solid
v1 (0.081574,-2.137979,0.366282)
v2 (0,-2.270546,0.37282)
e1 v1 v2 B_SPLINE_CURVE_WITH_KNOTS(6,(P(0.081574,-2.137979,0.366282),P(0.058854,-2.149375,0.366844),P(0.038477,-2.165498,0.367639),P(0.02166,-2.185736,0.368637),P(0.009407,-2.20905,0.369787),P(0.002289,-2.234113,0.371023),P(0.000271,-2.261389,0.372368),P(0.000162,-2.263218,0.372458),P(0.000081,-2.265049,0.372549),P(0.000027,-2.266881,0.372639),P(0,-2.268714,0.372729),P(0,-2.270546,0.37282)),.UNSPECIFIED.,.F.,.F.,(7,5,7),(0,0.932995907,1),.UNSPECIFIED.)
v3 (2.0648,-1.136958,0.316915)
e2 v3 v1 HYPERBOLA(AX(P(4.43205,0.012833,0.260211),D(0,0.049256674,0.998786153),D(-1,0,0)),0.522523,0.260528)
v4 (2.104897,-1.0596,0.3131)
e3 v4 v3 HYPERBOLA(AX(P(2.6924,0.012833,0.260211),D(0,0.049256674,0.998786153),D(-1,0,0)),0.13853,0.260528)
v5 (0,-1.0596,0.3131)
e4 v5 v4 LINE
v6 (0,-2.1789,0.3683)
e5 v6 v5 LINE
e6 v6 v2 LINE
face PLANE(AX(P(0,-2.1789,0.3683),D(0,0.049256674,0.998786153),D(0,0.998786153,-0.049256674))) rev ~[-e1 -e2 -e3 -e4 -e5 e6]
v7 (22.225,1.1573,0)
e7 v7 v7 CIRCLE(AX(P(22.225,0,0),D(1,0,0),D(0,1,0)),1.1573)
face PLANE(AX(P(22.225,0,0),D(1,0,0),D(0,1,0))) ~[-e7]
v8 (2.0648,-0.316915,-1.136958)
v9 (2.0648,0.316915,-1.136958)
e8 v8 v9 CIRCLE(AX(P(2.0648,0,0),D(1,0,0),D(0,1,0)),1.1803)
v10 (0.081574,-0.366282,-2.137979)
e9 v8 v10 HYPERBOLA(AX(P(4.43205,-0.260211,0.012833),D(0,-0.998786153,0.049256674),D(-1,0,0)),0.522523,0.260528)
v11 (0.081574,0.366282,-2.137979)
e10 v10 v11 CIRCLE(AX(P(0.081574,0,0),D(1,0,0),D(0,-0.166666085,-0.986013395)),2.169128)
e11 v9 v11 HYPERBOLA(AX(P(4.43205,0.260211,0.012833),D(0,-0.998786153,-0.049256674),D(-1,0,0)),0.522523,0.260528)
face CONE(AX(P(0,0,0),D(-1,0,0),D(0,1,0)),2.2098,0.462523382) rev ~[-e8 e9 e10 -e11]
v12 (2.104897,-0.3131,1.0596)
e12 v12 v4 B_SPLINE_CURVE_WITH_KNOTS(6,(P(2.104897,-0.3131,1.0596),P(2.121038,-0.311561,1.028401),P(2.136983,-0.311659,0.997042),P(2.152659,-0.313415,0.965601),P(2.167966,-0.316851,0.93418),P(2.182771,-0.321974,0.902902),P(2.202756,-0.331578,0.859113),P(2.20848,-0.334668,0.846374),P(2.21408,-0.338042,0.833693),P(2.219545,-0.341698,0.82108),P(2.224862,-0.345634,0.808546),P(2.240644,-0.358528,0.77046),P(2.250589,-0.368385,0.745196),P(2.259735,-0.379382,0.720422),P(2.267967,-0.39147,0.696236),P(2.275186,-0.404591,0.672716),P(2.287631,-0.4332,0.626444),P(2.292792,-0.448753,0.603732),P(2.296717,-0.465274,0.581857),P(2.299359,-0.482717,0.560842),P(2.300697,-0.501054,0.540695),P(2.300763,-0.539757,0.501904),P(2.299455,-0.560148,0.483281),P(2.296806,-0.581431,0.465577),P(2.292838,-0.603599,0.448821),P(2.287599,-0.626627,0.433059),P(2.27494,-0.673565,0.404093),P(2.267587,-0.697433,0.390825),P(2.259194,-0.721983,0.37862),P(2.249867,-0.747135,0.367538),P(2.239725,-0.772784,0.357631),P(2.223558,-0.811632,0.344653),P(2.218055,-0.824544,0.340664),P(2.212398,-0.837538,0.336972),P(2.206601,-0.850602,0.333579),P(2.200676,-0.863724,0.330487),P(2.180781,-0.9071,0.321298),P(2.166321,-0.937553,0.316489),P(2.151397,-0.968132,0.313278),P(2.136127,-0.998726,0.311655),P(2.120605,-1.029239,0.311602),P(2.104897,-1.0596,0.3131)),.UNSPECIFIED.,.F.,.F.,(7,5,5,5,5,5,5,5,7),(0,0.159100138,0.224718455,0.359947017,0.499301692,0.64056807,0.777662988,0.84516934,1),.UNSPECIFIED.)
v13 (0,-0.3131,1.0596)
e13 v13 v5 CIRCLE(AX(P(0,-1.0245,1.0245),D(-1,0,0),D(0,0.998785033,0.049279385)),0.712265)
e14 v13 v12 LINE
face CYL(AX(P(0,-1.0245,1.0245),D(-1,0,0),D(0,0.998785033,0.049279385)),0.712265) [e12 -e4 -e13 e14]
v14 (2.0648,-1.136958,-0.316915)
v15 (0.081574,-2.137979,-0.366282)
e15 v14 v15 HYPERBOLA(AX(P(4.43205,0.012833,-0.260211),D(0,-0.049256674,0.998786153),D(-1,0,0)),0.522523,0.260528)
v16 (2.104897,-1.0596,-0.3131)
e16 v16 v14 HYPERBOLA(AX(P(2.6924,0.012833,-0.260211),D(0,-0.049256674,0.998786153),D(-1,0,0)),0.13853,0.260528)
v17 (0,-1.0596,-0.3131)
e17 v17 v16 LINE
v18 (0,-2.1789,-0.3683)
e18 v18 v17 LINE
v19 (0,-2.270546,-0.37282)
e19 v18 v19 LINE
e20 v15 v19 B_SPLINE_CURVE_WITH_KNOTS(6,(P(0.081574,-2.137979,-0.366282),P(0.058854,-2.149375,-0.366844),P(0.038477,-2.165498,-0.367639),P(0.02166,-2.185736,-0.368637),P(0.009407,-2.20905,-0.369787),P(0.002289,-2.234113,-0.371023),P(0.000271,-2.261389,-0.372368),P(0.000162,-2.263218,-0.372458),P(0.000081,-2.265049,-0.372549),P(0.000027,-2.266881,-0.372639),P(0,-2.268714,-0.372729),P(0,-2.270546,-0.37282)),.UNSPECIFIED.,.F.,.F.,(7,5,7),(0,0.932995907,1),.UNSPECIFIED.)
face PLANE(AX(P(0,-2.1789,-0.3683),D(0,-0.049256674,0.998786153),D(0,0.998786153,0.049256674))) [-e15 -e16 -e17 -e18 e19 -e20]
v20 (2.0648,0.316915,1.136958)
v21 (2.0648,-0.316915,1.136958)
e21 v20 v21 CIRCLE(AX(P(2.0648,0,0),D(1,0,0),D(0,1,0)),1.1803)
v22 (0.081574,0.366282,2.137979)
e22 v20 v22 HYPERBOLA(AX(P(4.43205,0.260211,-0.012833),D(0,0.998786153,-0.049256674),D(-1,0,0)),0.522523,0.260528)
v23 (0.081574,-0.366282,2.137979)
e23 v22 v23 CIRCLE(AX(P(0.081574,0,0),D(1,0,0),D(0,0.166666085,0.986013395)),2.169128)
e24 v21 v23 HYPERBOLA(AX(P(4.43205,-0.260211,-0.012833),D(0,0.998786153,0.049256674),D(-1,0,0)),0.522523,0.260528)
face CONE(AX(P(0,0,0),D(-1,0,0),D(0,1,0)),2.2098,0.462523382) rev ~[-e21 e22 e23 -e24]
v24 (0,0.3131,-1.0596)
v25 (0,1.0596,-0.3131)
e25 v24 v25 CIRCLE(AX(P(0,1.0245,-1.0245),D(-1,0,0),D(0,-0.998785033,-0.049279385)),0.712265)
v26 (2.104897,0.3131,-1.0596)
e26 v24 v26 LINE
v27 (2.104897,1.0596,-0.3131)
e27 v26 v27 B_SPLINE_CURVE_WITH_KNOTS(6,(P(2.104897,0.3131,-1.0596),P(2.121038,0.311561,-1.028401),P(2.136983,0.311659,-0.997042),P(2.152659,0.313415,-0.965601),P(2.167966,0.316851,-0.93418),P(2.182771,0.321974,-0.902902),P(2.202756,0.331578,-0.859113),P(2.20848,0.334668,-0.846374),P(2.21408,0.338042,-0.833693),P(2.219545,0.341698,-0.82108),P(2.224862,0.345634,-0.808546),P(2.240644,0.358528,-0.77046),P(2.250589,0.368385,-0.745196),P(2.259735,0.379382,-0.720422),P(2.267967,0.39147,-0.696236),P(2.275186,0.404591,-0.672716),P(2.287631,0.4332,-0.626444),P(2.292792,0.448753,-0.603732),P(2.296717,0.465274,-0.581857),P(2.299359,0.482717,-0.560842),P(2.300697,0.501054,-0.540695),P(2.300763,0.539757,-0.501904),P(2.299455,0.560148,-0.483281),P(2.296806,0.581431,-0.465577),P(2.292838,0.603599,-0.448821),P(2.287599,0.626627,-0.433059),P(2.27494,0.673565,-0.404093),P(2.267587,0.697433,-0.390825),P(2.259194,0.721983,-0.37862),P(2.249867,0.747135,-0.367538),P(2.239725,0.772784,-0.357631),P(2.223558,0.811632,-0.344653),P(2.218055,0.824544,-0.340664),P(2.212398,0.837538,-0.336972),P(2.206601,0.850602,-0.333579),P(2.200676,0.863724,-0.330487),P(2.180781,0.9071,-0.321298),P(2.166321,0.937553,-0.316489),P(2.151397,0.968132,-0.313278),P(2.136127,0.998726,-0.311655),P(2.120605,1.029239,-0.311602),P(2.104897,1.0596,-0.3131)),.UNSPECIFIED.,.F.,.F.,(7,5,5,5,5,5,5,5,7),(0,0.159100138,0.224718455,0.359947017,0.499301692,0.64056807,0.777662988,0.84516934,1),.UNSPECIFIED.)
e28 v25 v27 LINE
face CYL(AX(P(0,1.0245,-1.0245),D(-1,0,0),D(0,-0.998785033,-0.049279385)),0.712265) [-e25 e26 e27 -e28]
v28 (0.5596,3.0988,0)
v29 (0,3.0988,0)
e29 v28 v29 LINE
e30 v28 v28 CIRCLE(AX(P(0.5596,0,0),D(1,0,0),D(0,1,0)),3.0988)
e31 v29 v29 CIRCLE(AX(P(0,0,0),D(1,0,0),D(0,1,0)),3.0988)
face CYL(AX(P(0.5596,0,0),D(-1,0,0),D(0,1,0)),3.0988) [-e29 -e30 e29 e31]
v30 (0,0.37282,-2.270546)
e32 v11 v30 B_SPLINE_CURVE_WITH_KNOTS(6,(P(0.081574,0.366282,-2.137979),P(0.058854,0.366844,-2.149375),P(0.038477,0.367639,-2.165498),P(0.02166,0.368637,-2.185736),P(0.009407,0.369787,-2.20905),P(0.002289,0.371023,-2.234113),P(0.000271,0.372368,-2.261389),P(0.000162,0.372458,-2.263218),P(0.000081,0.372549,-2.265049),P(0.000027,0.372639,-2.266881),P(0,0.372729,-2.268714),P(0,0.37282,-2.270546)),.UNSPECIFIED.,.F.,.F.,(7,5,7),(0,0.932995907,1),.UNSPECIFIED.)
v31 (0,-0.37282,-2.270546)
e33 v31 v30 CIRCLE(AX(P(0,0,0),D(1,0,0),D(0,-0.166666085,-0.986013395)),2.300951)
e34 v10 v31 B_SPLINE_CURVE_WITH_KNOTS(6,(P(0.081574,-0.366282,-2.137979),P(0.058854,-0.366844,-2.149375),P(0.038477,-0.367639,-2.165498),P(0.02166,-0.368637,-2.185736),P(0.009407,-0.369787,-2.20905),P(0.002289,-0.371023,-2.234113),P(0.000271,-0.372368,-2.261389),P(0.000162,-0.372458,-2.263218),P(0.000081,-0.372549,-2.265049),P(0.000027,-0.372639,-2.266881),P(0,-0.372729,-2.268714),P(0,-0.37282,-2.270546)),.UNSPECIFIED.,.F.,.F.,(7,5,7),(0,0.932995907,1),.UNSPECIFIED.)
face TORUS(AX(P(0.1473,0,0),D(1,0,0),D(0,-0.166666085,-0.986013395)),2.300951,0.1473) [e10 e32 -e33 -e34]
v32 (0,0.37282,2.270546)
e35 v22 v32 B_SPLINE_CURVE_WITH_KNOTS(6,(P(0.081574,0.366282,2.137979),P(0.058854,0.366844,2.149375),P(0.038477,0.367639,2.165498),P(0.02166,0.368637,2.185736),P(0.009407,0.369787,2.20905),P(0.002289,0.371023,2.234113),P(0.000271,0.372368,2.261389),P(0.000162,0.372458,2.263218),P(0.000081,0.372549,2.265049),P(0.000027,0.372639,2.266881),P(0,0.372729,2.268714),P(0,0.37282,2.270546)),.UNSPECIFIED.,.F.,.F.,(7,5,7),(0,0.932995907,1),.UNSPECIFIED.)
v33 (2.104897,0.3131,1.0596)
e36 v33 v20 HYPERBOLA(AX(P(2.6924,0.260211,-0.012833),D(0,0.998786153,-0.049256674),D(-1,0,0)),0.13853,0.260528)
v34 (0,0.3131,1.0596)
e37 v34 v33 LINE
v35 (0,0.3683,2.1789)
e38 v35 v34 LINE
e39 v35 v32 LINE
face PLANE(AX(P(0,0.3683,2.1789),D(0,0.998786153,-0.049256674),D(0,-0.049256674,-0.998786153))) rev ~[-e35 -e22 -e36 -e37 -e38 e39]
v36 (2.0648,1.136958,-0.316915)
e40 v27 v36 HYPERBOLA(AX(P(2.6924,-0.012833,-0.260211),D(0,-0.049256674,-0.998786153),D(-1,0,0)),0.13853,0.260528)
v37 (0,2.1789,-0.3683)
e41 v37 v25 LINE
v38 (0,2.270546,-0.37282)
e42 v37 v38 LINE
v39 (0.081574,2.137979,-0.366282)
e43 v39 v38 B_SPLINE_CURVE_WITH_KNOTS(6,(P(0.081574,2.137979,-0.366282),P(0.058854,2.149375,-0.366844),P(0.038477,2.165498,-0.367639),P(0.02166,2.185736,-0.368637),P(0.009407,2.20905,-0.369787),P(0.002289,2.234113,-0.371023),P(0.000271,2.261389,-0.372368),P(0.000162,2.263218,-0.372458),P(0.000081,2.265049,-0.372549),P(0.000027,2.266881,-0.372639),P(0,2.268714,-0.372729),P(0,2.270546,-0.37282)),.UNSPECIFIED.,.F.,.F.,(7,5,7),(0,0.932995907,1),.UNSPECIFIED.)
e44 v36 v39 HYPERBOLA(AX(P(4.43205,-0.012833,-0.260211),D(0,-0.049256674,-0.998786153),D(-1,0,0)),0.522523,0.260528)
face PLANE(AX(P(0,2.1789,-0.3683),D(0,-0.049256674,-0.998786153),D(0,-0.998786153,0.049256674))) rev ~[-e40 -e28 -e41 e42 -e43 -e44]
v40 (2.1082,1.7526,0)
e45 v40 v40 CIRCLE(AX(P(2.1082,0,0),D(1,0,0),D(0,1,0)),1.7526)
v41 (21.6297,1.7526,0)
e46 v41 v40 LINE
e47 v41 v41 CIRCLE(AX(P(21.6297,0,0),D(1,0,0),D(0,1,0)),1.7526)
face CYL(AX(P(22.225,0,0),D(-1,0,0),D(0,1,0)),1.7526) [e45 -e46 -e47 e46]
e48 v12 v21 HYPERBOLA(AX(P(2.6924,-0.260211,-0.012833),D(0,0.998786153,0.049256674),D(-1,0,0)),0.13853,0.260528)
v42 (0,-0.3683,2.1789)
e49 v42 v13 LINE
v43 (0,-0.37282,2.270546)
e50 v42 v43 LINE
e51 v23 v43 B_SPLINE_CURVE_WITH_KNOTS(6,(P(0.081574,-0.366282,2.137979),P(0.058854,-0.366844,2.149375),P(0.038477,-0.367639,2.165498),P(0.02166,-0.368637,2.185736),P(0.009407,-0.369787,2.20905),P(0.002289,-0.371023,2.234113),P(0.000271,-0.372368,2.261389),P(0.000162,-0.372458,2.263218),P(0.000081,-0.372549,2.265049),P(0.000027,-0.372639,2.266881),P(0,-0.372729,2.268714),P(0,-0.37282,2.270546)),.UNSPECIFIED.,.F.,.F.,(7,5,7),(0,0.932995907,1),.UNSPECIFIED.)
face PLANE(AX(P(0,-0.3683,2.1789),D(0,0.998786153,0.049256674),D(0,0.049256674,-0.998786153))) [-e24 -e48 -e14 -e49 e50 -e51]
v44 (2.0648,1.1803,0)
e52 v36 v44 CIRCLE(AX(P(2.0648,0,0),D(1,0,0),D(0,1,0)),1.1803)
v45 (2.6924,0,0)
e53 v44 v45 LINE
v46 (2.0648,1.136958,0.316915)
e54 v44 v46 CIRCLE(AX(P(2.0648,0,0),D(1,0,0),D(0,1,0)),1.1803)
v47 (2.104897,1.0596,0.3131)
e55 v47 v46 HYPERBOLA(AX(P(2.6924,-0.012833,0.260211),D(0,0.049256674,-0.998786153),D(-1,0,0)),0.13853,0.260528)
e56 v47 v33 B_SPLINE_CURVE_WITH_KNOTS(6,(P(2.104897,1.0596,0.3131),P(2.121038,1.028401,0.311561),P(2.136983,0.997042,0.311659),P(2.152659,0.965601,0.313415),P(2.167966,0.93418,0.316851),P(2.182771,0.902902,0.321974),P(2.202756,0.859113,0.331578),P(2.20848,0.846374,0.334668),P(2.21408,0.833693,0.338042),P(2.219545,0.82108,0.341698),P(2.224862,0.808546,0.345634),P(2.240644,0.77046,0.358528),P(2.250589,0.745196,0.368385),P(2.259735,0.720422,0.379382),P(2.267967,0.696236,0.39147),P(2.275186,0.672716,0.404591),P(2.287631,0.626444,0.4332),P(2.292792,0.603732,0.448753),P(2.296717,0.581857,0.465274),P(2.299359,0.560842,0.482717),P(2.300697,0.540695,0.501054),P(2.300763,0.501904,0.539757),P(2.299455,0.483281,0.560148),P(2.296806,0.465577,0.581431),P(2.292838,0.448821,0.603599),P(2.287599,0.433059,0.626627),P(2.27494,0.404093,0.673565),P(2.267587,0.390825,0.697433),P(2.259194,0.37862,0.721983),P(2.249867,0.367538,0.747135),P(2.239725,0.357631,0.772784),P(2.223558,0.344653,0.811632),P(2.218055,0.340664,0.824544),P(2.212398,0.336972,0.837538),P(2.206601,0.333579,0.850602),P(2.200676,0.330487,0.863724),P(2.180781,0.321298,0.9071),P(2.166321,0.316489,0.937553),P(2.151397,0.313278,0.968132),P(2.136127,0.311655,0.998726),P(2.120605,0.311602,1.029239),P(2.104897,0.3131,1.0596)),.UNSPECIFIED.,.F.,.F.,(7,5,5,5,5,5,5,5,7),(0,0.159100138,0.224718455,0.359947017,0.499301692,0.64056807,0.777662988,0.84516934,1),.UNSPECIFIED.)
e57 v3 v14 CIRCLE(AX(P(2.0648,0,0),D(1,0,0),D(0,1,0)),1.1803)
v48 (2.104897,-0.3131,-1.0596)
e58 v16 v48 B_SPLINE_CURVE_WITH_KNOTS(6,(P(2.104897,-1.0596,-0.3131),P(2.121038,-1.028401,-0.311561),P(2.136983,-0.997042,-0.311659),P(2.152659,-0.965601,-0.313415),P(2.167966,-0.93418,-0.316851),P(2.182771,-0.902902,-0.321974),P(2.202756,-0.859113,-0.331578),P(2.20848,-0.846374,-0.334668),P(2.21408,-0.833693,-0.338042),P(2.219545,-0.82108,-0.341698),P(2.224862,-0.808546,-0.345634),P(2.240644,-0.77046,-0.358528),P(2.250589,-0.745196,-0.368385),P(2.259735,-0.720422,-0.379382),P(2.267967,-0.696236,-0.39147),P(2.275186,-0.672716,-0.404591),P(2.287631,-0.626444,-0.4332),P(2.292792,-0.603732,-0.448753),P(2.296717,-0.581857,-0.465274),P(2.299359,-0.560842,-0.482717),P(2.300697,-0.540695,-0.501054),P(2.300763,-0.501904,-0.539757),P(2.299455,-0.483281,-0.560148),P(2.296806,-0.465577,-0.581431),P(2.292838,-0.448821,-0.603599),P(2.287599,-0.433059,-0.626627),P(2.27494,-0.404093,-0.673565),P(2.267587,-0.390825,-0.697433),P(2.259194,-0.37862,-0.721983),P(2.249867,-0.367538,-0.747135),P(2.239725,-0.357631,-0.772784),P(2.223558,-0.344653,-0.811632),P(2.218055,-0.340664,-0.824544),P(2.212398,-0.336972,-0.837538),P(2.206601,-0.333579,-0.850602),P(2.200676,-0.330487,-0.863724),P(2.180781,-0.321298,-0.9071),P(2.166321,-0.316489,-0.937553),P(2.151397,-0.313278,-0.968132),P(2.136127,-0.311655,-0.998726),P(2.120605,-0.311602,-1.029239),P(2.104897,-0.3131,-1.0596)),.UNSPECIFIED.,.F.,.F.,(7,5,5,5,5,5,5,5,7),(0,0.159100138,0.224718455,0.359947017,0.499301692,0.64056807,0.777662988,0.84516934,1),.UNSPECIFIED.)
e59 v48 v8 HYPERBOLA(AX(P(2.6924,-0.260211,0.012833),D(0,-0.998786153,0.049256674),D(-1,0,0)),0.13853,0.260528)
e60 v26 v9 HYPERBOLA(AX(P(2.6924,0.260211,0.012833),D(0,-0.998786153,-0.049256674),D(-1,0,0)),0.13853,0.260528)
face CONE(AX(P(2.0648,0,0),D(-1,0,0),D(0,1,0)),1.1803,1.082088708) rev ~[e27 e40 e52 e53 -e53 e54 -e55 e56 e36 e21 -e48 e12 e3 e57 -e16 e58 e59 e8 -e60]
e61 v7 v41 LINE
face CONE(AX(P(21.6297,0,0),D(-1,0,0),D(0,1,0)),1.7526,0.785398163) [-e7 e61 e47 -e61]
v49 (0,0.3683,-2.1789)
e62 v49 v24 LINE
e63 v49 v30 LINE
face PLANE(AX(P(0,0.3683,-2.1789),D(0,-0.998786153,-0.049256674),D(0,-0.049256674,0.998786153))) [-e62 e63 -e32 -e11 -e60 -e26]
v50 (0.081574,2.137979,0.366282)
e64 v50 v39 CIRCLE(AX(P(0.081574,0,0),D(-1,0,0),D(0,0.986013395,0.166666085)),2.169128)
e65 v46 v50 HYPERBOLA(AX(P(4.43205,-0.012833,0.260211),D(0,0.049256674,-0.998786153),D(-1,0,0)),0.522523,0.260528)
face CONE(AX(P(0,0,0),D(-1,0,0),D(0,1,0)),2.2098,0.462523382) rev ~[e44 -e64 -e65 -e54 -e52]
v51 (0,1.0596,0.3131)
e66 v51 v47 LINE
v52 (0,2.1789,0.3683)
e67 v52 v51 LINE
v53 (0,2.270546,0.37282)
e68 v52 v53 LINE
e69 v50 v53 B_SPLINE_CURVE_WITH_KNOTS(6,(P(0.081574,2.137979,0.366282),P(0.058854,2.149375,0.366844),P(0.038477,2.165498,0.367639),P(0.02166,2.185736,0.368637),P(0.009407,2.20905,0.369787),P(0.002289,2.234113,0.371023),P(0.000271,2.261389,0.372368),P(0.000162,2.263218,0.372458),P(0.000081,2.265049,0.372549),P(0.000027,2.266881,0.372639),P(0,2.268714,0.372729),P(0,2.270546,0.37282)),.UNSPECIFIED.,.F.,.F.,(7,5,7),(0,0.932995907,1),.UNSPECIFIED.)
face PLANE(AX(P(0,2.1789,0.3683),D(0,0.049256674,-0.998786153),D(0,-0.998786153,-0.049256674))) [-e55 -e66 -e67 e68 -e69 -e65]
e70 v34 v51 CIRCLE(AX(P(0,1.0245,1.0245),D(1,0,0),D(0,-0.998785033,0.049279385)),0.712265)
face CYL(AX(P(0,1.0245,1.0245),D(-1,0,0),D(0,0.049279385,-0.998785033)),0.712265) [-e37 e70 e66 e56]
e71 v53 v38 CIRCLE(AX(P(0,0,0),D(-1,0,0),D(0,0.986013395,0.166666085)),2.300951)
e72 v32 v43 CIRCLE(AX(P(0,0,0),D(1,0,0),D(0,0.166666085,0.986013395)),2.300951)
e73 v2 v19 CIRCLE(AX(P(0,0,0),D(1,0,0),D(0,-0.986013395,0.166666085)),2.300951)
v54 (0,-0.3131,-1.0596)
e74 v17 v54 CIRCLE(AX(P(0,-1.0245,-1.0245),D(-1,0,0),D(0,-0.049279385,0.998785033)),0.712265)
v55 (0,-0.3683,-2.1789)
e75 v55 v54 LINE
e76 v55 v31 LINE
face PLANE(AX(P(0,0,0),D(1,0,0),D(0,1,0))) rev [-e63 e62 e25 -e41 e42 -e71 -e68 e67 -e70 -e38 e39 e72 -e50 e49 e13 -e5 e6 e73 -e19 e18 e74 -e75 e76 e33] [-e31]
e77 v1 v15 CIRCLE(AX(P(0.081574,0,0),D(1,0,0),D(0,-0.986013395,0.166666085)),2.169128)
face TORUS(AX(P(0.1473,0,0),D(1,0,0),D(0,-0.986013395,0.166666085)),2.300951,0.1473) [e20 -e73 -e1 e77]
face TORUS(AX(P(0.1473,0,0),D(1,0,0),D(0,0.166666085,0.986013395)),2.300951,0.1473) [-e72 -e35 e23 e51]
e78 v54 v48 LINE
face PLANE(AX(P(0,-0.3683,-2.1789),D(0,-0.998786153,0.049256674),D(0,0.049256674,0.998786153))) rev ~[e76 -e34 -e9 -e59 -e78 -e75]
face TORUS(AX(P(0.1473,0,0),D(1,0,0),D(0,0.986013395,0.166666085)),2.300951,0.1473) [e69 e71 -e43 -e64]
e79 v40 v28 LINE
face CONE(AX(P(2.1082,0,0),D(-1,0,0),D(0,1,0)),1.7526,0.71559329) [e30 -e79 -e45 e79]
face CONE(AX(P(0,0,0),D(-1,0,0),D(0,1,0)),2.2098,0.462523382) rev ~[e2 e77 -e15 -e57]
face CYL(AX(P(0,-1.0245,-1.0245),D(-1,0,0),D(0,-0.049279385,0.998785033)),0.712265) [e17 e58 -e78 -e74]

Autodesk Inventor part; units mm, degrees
ref_plane "YZ Plane" through (0, 0, 0) normal (1, 0, 0) x (0, 1, 0)
ref_plane "XZ Plane" through (0, 0, 0) normal (0, 1, 0) x (-1, 0, 0)
sketch "Sketch1" plane through (0, 0, 0) normal (0, 0, 1) x (1, 0, 0)
  line L0 (2.6924, 0) -> (22.225, 0)
  line L1 (22.225, 0) -> (22.225, 1.7526)
  line L2 (22.225, 1.7526) -> (2.1082, 1.7526)
  line L3 (0.5596, 3.0988) -> (0, 3.0988)
  line L4 (-4.445, 0) -> (26.67, 0) projected
  line L5 (0, -0.6198) -> (0, 3.7186) projected
  line L6 (0, 2.2098) -> (2.0648, 1.1803)
  line L7 (2.0648, 1.1803) -> (2.6924, 0)
  line L8 (2.1082, 1.7526) -> (0.5596, 3.0988)
  line L9 (0, 3.0988) -> (0, 2.2098)
  dimension "d2" = 3.5052
  dimension "d3" = 6.1976
  dimension "d4" = 2.6924
  dimension "d5" = 4.4196
  dimension "d6" = 26.5
  dimension "d7" = 62
  dimension "d13" = 41
  dimension "d14" = 2.1082
  dimension "d15" = 22.225
revolve "Body" add sketch "Sketch1" angle 360 about axis through (2.6924, 0, 0) along (1, 0, 0) contours L7 L6 L5 L3 L8 L2 L1 L0
sketch "Sketch2" plane through (0, 0, 0) normal (-1, 0, 0) x (0, 0, 1)
  line L0 (0, -4.3383) -> (0, 4.3383) projected
  line L1 (-4.3383, 0) -> (4.3383, 0) projected
  line L2 (0, 2.2098) -> (0, 0) construction
  line L3 (0, 0) -> (2.2098, 0) construction
  arc A0 (0.7366, 0) -> (0, 0.7366) centre (0, 0) ccw
  line L4 (0, 0) -> (0.7947, 0.7947) construction
  arc A1 (1.1049, 0) -> (0, 1.1049) centre (0, 0) ccw construction
  line L5 (0.3683, 2.1789) -> (0.3131, 1.0596)
  line L6 (2.1789, 0.3683) -> (1.0596, 0.3131)
  arc A2 (0.3131, 1.0596) -> (1.0596, 0.3131) centre (1.0245, 1.0245) ccw
  arc A3 (2.2098, 0) -> (2.1789, 0.3683) centre (0, 0) ccw
  arc A4 (0.3683, 2.1789) -> (0, 2.2098) centre (0, 0) ccw
  arc A5 (2.1789, 0.3683) -> (0.3683, 2.1789) centre (0, 0) ccw
  line L7 (0.3683, -2.1789) -> (0.3131, -1.0596)
  line L8 (2.1789, -0.3683) -> (1.0596, -0.3131)
  arc A6 (1.0596, -0.3131) -> (0.3131, -1.0596) centre (1.0245, -1.0245) ccw
  arc A7 (2.1789, -0.3683) -> (2.2098, 0) centre (0, 0) ccw
  arc A8 (0, -2.2098) -> (0.3683, -2.1789) centre (0, 0) ccw
  arc A9 (0.3683, -2.1789) -> (2.1789, -0.3683) centre (0, 0) ccw
  line L9 (-0.3683, 2.1789) -> (-0.3131, 1.0596)
  line L10 (-2.1789, 0.3683) -> (-1.0596, 0.3131)
  arc A10 (-1.0596, 0.3131) -> (-0.3131, 1.0596) centre (-1.0245, 1.0245) ccw
  arc A11 (-2.1789, 0.3683) -> (-2.2098, 0) centre (0, 0) ccw
  arc A12 (0, 2.2098) -> (-0.3683, 2.1789) centre (0, 0) ccw
  arc A13 (-0.3683, 2.1789) -> (-2.1789, 0.3683) centre (0, 0) ccw
  arc A14 (-2.1789, -0.3683) -> (-0.3683, -2.1789) centre (0, 0) ccw
  arc A15 (-0.3683, -2.1789) -> (0, -2.2098) centre (0, 0) ccw
  arc A16 (-2.2098, 0) -> (-2.1789, -0.3683) centre (0, 0) ccw
  line L11 (-2.1789, -0.3683) -> (-1.0596, -0.3131)
  arc A17 (-0.3131, -1.0596) -> (-1.0596, -0.3131) centre (-1.0245, -1.0245) ccw
  line L12 (-0.3683, -2.1789) -> (-0.3131, -1.0596)
  dimension "d18" = 45
  dimension "d19" = 1.4732
  dimension "d20" = 2.2098
  dimension "d21" = 4.4196
  dimension "d22" = 0.3683
extrude "Slot" add sketch "Sketch2" against normal up to next contours A2 L5 A5 L6 | L9 A10 L10 A13 | L7 A6 L8 A9 | A14 L11 A17 L12
fillet "Fillet1" radius 0.1473 4 edges at (0, 2.2098, 0) (0, 0, 2.2098) (0, -2.2098, 0) (0, 0, -2.2098)
thread "Thread" size "6-32 UNC" class "2A" standard "ANSI Unified Screw Threads" length 18.1324
chamfer "Chamfer1" distance 0.5953 distance2 0.5953 1 edges at (22.225, -1.7526, 0) measured on face at (22.225, -0.5173, -0.2715)
ref_plane "Work Plane2" through (2.032, 0, 0) normal (0, 1, 0) x (1, 0, 0)
equation "\"d2\" = GD"
equation "\"d3\" = KOD"
equation "\"d4\" = INTI"
equation "\"d5\" = SDM"
equation "\"d13\" = 0.5 * SEWI"
equation "\"d14\" = KOH"
equation "\"d15\" = NLG"
equation "\"d19\" = 0.333333 * SDM"
equation "\"d20\" = 0.5 * SDM"
equation "\"d21\" = SDM"
equation "\"d22\" = 0.5 * SBR"
equation "\"d45\" = INTI"
equation "\"d25\" = 0.2 * SBR"
equation "\"d9\" = GEL"
equation "\"d11\" = -0.5 * SPD + 0.5 * GD"
equation "\"d12\" = GUL"
equation "\"GD\" = NND"
equation "\"NLG\" = 22.225"
equation "\"GEL\" = 18.13243"
equation "\"KOD\" = 6.1976"
equation "\"KOH\" = 2.1082"
equation "\"SDM\" = 4.4196"
equation "\"INTI\" = 2.6924"
equation "\"SBR\" = 0.7366"
equation "\"GUL\" = 0.75 * GAL"
equation "\"SPD\" = 2.31458"
equation "\"SEWI\" = 82deg"
equation "\"d0\" = NLG"
equation "\"d1\" = KOH"
equation "\"d17\" = SDM"
equation "\"TOA\" = 30deg"
equation "\"THREADDIA\" = 3.5052"
equation "\"BDM\" = NND"
equation "\"NND\" = 3.5052"
equation "\"GAL\" = 0.79375"
equation "\"GD1\" = SPD"
properties part number "ANSI B18.6.3 - 6-32 x 7/8, CRFCHMSTII(5)" material "Steel, Mild"
